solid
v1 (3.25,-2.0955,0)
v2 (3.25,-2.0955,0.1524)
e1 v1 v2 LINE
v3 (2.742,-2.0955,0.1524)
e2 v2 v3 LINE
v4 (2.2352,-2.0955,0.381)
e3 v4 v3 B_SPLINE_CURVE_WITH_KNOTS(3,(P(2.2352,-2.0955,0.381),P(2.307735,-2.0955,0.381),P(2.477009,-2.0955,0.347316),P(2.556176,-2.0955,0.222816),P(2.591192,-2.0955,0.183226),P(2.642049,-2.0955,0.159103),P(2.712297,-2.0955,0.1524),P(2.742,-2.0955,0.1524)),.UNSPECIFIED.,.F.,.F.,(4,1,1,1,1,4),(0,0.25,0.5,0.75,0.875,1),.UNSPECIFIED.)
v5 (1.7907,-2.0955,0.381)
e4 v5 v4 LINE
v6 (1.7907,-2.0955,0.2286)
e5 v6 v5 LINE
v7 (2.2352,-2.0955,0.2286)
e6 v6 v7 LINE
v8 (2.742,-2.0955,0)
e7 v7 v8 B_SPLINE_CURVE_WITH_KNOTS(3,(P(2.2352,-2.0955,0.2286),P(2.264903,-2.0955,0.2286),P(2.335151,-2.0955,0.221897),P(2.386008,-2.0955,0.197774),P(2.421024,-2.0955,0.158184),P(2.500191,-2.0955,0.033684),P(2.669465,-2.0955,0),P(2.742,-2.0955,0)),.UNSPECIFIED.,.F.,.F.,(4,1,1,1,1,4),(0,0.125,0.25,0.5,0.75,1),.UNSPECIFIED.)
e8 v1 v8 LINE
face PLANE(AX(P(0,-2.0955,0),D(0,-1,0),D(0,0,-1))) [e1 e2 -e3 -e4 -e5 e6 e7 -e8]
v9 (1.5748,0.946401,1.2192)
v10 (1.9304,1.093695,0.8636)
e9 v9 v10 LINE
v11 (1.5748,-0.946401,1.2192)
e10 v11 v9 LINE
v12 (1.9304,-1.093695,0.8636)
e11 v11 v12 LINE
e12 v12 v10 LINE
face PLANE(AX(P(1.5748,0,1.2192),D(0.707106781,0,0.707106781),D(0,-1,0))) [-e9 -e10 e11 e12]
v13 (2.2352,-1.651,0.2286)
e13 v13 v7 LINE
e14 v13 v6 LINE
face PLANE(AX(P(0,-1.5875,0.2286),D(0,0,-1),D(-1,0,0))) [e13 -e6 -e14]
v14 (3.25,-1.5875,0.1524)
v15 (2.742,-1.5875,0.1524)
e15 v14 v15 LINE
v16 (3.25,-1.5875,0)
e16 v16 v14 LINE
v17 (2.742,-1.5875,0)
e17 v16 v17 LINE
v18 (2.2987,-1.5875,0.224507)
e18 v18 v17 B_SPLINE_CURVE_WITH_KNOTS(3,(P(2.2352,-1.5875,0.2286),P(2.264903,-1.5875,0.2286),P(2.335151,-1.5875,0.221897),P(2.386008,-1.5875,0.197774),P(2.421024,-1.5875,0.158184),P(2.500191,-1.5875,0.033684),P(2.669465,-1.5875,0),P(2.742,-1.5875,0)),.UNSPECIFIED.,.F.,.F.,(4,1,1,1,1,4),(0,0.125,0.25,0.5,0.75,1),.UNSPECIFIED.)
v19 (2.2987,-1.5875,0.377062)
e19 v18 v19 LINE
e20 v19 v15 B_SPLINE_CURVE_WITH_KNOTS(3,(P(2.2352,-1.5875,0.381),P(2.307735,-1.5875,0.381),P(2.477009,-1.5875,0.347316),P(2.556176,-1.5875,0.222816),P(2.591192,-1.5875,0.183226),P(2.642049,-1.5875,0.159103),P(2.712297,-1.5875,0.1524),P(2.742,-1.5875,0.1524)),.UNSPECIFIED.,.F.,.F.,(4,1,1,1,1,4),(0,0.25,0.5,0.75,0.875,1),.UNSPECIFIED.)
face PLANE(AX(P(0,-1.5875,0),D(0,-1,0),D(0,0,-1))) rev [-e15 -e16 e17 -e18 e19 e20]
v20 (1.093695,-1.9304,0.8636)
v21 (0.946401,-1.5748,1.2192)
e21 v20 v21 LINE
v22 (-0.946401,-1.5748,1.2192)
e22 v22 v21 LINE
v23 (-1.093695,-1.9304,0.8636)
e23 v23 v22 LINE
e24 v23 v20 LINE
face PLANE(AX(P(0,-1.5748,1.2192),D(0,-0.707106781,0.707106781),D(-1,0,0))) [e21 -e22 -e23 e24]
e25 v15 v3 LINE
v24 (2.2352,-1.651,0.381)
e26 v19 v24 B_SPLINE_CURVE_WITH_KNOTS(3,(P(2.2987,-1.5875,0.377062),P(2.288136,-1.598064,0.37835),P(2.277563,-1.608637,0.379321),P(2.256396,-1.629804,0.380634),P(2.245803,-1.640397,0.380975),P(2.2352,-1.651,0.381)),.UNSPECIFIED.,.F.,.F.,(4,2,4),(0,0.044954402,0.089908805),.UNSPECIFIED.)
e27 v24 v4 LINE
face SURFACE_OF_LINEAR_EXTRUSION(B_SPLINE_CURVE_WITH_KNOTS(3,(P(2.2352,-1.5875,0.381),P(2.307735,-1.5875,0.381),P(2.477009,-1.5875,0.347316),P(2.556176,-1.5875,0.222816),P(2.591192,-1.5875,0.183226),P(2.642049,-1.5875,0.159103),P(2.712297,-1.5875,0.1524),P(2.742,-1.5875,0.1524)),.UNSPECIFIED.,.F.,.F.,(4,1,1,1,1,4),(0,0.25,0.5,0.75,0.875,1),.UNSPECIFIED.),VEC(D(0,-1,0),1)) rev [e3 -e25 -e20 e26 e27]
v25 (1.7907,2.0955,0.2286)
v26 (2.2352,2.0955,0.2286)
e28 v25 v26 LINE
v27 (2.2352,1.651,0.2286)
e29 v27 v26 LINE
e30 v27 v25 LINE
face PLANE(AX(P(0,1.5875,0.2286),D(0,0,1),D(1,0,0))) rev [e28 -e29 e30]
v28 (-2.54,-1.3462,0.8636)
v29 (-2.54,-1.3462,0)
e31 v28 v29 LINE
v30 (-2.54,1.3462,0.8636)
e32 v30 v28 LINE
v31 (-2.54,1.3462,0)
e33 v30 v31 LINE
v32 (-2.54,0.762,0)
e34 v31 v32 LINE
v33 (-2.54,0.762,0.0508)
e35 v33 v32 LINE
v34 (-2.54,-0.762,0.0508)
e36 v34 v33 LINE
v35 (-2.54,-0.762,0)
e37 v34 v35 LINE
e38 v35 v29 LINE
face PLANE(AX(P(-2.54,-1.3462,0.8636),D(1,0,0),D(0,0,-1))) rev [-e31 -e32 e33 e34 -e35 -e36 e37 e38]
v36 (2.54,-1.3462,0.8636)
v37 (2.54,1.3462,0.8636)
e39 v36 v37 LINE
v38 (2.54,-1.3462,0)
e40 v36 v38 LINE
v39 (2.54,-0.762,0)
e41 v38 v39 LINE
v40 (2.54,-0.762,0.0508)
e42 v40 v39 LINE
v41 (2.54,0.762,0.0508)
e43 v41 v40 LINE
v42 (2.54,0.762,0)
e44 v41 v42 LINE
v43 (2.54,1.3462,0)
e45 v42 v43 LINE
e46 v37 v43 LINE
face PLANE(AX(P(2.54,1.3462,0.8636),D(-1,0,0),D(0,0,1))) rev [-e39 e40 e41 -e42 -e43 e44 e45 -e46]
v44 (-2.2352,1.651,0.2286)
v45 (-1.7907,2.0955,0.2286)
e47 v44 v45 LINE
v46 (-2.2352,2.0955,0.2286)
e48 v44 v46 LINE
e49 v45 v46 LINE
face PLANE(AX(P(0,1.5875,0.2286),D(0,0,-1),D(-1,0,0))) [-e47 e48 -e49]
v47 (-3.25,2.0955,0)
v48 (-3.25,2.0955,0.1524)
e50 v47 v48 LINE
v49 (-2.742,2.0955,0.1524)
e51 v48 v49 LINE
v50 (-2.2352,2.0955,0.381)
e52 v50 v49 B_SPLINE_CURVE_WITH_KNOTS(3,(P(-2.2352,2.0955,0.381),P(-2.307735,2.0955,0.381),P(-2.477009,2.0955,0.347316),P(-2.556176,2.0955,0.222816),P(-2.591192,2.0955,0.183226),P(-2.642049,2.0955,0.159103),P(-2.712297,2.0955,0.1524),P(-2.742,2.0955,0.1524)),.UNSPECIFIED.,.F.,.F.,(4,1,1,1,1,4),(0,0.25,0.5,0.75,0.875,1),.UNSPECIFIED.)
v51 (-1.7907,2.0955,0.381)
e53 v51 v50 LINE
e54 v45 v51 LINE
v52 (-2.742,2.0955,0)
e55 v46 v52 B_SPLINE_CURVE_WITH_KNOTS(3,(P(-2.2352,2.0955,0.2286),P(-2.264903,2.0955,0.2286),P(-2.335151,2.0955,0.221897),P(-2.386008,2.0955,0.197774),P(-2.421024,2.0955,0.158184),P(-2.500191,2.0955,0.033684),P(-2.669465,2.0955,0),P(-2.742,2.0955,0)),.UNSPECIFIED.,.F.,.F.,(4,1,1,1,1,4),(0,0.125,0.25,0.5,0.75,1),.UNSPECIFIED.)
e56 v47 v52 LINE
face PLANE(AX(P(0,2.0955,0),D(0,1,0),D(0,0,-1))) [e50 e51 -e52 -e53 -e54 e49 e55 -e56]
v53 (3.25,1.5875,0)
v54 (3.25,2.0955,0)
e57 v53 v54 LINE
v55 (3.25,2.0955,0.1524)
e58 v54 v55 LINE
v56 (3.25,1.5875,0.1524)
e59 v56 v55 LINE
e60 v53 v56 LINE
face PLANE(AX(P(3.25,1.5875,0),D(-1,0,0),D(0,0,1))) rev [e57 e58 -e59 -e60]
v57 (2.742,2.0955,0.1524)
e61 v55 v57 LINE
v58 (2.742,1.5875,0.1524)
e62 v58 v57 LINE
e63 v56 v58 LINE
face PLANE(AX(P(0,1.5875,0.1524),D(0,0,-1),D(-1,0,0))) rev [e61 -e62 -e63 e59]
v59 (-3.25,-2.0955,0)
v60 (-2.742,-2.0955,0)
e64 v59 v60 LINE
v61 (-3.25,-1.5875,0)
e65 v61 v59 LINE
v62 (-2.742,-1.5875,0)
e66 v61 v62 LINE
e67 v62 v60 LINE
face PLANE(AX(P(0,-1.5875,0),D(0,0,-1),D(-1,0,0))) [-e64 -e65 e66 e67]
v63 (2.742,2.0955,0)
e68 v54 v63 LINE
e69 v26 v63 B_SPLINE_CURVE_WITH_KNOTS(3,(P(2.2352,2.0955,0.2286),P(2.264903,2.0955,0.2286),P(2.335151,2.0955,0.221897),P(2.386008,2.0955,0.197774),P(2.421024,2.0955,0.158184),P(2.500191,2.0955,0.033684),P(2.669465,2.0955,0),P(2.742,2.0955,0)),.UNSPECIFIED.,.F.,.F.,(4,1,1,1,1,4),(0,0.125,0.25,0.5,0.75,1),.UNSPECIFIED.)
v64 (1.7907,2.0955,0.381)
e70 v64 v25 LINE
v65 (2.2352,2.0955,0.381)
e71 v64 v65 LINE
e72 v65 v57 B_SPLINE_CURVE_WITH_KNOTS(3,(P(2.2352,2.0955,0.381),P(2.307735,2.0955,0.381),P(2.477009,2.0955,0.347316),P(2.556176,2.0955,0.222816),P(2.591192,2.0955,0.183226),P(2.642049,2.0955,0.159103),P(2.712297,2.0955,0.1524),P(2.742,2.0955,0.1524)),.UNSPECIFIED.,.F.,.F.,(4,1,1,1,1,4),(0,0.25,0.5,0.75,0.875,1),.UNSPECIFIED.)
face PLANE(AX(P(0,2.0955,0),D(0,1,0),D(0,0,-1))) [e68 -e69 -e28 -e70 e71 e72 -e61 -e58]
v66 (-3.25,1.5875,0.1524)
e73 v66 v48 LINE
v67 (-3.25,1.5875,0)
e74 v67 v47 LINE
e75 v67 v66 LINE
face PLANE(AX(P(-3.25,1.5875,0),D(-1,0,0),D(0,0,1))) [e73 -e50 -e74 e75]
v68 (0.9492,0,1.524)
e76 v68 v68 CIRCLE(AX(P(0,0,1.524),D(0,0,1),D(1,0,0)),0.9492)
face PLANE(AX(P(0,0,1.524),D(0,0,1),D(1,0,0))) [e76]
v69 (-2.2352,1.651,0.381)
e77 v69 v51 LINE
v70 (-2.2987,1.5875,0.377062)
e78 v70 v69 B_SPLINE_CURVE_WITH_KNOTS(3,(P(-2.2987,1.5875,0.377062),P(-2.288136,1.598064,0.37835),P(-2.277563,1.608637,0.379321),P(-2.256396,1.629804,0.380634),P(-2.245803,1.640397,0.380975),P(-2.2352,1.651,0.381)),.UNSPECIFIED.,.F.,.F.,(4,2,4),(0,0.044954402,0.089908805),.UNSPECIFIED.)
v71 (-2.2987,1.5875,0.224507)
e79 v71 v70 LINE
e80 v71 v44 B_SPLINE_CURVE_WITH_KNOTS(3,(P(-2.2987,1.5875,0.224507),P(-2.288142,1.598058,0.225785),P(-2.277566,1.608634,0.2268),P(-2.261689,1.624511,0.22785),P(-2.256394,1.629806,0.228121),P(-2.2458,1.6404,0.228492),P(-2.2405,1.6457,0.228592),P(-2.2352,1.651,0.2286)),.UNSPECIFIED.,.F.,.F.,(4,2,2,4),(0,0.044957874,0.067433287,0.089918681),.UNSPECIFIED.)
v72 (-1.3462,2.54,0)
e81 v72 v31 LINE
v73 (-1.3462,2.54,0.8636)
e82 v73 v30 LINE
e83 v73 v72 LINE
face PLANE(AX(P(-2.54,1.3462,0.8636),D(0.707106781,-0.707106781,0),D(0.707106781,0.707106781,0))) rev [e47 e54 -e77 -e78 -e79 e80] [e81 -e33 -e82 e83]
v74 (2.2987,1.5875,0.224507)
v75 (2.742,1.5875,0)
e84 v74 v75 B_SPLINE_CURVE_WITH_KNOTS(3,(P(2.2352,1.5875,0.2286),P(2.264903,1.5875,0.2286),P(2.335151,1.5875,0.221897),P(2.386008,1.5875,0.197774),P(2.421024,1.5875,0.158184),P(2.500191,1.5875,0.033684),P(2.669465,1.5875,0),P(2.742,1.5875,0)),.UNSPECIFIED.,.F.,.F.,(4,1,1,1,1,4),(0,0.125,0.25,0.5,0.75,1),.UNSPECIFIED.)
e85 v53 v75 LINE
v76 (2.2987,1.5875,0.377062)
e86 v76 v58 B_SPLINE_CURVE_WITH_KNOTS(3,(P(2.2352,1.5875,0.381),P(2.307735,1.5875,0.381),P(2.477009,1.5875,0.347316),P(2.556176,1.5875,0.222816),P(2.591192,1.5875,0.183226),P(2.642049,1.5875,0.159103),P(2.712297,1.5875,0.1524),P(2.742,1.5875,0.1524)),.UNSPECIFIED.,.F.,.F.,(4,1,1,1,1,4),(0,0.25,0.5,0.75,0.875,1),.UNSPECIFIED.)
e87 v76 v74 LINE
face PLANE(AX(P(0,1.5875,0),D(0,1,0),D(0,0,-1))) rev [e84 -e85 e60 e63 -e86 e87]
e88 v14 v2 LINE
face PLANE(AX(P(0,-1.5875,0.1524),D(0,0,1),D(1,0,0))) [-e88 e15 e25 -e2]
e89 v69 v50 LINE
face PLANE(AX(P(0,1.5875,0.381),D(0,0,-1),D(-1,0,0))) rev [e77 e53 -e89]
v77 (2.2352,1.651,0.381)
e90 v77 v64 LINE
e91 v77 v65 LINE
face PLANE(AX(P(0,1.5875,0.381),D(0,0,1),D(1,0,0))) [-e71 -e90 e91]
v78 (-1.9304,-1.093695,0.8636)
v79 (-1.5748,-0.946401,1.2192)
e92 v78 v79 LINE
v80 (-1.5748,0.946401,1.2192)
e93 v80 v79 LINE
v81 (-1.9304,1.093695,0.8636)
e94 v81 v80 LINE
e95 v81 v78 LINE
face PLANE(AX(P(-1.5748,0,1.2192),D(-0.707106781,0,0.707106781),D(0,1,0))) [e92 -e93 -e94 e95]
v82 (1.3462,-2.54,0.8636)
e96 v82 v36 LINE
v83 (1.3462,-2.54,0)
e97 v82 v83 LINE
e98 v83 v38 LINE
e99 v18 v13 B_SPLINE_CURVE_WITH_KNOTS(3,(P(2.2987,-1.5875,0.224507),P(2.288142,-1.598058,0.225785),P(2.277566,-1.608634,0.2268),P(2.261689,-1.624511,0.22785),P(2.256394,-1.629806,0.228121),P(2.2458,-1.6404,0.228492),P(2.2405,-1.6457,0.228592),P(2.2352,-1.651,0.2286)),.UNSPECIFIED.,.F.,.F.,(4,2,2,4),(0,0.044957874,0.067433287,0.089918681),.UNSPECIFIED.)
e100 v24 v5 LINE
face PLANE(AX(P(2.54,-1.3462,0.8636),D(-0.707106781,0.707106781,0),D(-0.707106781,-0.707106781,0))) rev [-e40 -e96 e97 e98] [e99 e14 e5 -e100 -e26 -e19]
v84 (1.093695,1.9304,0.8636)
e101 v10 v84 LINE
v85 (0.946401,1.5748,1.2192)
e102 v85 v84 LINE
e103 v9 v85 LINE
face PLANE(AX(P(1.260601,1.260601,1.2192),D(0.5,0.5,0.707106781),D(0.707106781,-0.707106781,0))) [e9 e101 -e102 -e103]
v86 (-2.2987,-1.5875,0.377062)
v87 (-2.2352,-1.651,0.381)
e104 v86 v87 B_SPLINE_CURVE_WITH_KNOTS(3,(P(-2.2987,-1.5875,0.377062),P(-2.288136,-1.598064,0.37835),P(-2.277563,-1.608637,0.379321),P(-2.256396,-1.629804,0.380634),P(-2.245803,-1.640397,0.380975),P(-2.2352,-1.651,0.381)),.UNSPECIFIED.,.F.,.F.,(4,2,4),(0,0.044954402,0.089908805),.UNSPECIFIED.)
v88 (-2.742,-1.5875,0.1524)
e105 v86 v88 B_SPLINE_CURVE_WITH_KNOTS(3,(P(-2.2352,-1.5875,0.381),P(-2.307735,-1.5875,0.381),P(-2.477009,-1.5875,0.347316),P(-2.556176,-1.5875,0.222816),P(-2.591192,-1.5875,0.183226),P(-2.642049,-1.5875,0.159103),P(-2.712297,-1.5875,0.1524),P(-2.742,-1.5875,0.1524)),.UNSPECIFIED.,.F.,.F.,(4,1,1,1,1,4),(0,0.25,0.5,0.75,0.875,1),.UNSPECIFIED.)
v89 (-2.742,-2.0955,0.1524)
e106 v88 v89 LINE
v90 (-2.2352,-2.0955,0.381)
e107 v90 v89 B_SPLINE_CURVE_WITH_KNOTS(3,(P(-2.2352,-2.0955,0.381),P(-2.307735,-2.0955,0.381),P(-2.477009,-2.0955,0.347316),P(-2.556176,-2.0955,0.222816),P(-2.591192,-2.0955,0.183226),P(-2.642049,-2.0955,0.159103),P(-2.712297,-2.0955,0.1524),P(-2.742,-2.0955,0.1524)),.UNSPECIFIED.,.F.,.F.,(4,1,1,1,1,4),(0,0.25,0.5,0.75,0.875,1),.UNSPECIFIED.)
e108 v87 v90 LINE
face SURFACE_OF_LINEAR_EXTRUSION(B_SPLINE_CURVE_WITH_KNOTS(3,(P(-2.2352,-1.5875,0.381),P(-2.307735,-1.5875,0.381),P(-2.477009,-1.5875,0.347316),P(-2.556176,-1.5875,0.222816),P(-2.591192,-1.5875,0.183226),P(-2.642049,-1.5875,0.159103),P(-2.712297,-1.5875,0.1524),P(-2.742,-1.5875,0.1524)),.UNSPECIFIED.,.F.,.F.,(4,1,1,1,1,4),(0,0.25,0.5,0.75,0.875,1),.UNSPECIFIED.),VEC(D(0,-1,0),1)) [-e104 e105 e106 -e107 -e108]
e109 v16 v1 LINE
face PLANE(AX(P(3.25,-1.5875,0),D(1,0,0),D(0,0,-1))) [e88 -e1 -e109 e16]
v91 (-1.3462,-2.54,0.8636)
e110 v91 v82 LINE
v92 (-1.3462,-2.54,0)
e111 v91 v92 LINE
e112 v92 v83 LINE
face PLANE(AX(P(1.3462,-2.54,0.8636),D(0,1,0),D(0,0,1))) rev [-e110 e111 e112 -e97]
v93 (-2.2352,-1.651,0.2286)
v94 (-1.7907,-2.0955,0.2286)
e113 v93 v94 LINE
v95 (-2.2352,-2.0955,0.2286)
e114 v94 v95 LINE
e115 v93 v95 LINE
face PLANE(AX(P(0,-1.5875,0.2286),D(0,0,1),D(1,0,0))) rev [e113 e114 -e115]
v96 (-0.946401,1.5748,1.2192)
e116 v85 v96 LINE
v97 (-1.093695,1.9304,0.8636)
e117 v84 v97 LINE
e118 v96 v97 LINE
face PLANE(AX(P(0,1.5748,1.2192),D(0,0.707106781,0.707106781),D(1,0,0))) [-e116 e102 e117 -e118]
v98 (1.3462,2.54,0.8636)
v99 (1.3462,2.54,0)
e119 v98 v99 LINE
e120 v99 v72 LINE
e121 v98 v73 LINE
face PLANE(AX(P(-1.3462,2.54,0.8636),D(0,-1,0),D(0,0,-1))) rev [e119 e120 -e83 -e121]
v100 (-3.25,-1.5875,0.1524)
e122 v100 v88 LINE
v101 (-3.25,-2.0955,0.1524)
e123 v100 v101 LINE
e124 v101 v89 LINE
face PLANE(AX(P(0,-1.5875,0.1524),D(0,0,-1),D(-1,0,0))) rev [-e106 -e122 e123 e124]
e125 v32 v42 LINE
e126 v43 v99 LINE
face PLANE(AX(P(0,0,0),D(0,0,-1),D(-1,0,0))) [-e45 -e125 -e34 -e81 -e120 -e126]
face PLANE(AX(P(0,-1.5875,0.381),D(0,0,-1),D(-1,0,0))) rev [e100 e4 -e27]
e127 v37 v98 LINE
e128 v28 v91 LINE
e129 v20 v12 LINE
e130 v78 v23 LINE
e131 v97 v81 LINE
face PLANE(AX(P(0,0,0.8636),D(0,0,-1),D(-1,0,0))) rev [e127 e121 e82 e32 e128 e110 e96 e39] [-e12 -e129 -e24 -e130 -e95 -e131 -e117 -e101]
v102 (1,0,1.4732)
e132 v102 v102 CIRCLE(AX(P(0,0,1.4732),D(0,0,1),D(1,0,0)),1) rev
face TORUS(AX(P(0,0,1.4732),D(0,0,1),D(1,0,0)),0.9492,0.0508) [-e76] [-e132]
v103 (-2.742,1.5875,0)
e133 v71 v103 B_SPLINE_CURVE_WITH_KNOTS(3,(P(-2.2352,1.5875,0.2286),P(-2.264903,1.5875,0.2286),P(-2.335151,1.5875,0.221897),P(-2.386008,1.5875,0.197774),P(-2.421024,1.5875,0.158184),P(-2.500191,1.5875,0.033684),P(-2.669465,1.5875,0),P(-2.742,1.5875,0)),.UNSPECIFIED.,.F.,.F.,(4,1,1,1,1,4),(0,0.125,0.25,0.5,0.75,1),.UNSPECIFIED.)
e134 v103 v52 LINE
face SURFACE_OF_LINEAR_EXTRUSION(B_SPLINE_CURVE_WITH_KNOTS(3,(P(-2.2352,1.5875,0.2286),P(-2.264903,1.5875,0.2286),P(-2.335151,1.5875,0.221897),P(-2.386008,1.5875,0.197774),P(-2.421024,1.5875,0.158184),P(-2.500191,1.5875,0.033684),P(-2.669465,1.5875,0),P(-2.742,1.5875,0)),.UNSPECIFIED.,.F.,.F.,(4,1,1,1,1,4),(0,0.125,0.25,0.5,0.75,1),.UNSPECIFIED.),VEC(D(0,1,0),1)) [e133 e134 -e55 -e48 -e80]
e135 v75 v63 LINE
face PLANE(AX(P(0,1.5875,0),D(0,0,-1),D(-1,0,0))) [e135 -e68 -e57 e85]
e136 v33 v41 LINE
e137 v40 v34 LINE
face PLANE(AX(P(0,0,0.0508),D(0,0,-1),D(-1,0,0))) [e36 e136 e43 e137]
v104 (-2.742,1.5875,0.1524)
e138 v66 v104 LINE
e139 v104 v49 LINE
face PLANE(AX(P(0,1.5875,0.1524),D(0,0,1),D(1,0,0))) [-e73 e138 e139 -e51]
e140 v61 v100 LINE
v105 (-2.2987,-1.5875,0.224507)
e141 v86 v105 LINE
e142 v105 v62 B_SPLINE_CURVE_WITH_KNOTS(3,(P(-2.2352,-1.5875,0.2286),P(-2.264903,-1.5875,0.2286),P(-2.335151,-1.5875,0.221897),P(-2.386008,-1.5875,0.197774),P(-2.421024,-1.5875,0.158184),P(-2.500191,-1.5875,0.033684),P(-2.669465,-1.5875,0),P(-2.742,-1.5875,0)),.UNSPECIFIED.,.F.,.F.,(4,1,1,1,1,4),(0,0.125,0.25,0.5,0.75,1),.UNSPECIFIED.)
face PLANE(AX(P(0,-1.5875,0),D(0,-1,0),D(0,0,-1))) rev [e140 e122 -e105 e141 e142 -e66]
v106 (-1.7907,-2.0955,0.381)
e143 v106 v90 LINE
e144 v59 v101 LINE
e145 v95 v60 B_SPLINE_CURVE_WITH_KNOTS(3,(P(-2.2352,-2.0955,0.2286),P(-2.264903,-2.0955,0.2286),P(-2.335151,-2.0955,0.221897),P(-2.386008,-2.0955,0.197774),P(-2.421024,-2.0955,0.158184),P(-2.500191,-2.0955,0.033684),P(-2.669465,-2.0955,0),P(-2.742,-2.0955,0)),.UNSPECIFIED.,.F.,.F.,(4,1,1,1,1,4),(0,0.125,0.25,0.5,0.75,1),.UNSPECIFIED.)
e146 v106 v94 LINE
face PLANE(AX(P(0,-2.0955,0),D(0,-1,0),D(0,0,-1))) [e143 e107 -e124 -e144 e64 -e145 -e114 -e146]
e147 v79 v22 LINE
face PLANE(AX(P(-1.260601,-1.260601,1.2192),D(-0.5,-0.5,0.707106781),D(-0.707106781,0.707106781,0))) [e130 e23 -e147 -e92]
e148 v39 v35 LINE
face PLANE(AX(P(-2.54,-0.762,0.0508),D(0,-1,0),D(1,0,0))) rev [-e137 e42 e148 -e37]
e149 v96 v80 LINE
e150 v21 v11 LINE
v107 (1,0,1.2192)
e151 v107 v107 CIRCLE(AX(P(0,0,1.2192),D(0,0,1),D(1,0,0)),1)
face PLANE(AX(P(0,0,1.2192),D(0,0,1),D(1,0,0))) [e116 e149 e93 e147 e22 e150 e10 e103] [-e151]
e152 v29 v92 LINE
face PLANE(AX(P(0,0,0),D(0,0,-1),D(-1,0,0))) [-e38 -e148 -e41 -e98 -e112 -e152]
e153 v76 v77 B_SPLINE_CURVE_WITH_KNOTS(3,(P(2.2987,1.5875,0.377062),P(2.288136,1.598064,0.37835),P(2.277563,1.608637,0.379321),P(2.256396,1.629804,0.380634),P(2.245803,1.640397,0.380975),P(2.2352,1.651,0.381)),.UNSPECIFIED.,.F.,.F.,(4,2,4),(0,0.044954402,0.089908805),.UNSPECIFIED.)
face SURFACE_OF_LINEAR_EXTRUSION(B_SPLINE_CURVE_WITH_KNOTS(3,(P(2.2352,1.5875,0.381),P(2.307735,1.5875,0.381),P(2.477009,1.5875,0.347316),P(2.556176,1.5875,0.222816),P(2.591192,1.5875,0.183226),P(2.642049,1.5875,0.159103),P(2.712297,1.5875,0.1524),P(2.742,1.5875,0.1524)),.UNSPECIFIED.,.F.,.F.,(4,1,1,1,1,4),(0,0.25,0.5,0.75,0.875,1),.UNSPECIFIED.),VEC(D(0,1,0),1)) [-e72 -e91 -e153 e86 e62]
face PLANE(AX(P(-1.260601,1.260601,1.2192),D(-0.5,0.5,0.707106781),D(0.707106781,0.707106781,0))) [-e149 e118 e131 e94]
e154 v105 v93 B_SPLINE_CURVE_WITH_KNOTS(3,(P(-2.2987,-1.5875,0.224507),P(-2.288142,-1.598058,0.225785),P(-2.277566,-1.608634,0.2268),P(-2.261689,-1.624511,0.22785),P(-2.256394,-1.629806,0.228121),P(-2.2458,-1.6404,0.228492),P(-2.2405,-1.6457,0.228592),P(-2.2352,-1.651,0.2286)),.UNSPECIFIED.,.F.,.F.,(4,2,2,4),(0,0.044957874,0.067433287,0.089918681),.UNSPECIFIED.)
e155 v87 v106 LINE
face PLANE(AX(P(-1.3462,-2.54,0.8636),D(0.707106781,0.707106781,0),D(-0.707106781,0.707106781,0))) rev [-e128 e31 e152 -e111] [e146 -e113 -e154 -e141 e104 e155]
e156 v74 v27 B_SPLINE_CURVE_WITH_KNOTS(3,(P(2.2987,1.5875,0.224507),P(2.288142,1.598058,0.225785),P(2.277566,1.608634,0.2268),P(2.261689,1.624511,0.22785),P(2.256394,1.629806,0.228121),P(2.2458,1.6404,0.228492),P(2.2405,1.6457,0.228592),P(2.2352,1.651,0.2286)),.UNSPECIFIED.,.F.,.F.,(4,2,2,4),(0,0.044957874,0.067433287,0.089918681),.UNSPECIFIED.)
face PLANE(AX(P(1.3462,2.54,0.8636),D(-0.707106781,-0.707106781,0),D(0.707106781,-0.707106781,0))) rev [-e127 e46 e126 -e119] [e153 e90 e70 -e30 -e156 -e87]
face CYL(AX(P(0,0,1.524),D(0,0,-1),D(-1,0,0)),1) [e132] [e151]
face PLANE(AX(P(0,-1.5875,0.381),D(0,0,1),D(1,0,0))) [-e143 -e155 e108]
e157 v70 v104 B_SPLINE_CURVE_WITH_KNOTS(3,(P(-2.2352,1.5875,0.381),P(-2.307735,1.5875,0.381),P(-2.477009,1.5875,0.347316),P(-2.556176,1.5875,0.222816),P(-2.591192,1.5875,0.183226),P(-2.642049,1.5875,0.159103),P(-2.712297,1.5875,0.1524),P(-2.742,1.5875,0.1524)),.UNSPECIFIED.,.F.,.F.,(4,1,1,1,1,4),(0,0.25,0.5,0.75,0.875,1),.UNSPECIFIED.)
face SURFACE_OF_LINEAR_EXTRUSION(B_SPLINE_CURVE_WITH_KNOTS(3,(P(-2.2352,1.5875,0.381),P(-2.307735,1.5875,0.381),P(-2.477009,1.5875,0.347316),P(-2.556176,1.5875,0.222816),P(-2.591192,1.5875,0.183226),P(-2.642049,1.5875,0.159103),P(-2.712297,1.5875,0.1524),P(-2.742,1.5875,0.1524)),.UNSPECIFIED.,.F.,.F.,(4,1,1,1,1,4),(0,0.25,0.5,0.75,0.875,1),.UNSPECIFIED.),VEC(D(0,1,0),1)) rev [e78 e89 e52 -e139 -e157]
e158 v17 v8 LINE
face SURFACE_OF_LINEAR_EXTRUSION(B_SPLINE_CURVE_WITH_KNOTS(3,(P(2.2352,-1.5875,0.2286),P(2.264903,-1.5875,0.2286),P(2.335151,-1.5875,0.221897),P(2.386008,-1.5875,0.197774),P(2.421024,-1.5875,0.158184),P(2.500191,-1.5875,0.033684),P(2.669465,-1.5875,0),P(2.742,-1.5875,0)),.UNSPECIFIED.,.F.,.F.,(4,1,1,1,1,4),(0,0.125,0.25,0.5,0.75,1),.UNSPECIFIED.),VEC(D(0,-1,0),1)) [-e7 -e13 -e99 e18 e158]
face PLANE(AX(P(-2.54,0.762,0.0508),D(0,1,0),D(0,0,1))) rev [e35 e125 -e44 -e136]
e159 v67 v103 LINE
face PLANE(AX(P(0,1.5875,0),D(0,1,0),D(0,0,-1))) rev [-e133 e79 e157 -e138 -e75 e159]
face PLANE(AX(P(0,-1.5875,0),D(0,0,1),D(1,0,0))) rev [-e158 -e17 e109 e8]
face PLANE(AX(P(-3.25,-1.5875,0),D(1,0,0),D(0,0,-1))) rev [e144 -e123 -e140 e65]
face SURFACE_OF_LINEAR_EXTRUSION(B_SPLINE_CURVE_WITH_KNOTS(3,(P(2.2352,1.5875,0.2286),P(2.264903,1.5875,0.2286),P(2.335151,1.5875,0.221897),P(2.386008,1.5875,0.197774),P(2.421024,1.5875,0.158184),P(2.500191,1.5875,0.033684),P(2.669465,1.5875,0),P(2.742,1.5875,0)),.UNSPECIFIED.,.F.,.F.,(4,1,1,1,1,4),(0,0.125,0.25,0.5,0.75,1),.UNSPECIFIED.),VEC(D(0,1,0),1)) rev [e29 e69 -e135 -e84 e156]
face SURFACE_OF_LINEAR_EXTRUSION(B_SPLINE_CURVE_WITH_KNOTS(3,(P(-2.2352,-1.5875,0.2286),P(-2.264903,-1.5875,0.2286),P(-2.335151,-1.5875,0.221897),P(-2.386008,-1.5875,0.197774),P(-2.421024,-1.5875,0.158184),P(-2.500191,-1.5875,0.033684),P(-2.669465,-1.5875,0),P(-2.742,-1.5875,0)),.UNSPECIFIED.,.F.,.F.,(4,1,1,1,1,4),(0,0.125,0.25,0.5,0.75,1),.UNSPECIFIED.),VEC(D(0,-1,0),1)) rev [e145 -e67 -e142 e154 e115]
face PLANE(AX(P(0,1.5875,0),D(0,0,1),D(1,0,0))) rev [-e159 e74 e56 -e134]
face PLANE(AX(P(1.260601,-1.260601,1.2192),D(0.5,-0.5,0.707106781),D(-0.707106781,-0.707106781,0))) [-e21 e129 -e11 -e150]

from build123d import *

# Parameters (mm, degrees)
BASE_DEPTH              = 0.8636
TIER1_DEPTH             = 0.3556
CHAMFER1_SIZE           = 0.3556
SKETCH3_R               = 1
BUTTON_DEPTH            = 0.3048
BUTTONC_R               = 0.0508
SKETCH4_W               = 5.08
SKETCH4_H               = 1.524
BOTTOM_CUT_DEPTH        = 0.0508
PINS_START              = -0.4445
SKETCH6_W               = 0.508
SKETCH6_H               = 0.1524
PINS_DEPTH              = 0.508
MIRROR2_START           = -0.4445
MIRROR2_COPY_1_SKETCH_W = 0.508
MIRROR2_COPY_1_SKETCH_H = 0.1524
MIRROR2_COPY_1_DEPTH    = 0.508


with BuildPart() as part:
    # Sketch1 → Base (new body)
    with BuildSketch(Plane.XY):
        Polygon((-1.3462, 2.54), (1.3462, 2.54), (2.54, 1.3462), (2.54, -1.3462), (1.3462, -2.54), (-1.3462, -2.54), (-2.54, -1.3462), (-2.54, 1.3462), align=None)
    extrude(amount=BASE_DEPTH)

    # Sketch2 → Tier1 (add)
    with BuildSketch(Plane.XY.offset(0.8636)):
        Polygon((-1.093695412, 1.9304), (-1.9304, 1.093695412), (-1.9304, -1.093695412), (-1.093695412, -1.9304), (1.093695412, -1.9304), (1.9304, -1.093695412), (1.9304, 1.093695412), (1.093695412, 1.9304), align=None)
    extrude(amount=TIER1_DEPTH)

    # Chamfer1
    chamfer1_edges = [part.edges().sort_by_distance(p)[0] for p in [
        (-1.512047706, 1.512047706, 1.2192),
        (0, 1.9304, 1.2192),
        (1.512047706, 1.512047706, 1.2192),
        (1.9304, 0, 1.2192),
        (1.512047706, -1.512047706, 1.2192),
        (0, -1.9304, 1.2192),
        (-1.512047706, -1.512047706, 1.2192),
        (-1.9304, 0, 1.2192),
    ]]
    chamfer(chamfer1_edges, length=CHAMFER1_SIZE - 0.0001)  # a hair under: the kernel refuses the full size

    # Sketch3 → Button (add)
    with BuildSketch(Plane.XY.offset(1.2192)):
        Circle(SKETCH3_R)
    extrude(amount=BUTTON_DEPTH)

    # ButtonC
    buttonc_edges = [part.edges().sort_by_distance(p)[0] for p in [
        (-1, 0, 1.524),
    ]]
    fillet(buttonc_edges, radius=BUTTONC_R)

    # Sketch4 → Bottom cut (cut)
    with BuildSketch(Plane(origin=(0, 0, 0), x_dir=(-1, 0, 0), z_dir=(0, 0, -1))):
        Rectangle(SKETCH4_W, SKETCH4_H)
    extrude(amount=-BOTTOM_CUT_DEPTH, mode=Mode.SUBTRACT)

    # Sketch6 → pins (add)
    with BuildSketch(Plane.XZ.offset(2.54).offset(PINS_START)):
        with Locations((-1.0922, 0.3048)):
            Rectangle(SKETCH6_W, SKETCH6_H)
        Polygon((-1.3462, 0.2286), (-1.3462, 0.381), (-2.2352, 0.381), (-2.2352, 0.3048), (-2.2352, 0.2286), align=None)
        with BuildLine():
            Line((-2.2352, 0.3048), (-2.2352, 0.381))
            add(Edge.make_bspline(
                [(-2.2352, 0.381), (-2.307735088, 0.381), (-2.477008689, 0.347316172), (-2.556176281, 0.222815828), (-2.591192004, 0.183226461), (-2.642048799, 0.15910292), (-2.712296659, 0.1524), (-2.742, 0.1524)],
                knots=[0, 0, 0, 0, 0.25, 0.5, 0.75, 0.875, 1, 1, 1, 1], degree=3))
            Line((-2.742, 0.1524), (-2.742, 0.0762))
            add(Edge.make_bspline(
                [(-2.2352, 0.3048), (-2.573866667, 0.3048), (-2.403333333, 0.0762), (-2.742, 0.0762)],
                knots=[0, 0, 0, 0, 1, 1, 1, 1], degree=3))
        make_face()
        with BuildLine():
            Line((-2.2352, 0.2286), (-2.2352, 0.3048))
            add(Edge.make_bspline(
                [(-2.2352, 0.3048), (-2.573866667, 0.3048), (-2.403333333, 0.0762), (-2.742, 0.0762)],
                knots=[0, 0, 0, 0, 1, 1, 1, 1], degree=3))
            Line((-2.742, 0.0762), (-2.742, 0))
            add(Edge.make_bspline(
                [(-2.2352, 0.2286), (-2.264903341, 0.2286), (-2.335151201, 0.22189708), (-2.386007996, 0.197773539), (-2.421023719, 0.158184172), (-2.500191311, 0.033683828), (-2.669464912, 0), (-2.742, 0)],
                knots=[0, 0, 0, 0, 0.125, 0.25, 0.5, 0.75, 1, 1, 1, 1], degree=3))
        make_face()
        with Locations((-2.996, 0.0762)):
            Rectangle(SKETCH6_W, SKETCH6_H)
    pins = extrude(amount=-PINS_DEPTH)

    # pins2: pins across plane
    add(pins.mirror(Plane.ZX))

    # Mirror2: pins across plane
    add(pins.mirror(Plane(origin=(0, 0, 0), x_dir=(0, 0, 1), z_dir=(1, 0, 0))))

    # Mirror2 copy 1 sketch → Mirror2 copy 1 (add)
    with BuildSketch(Plane(origin=(0, 2.54, 0), x_dir=(-1, 0, 0), z_dir=(0, 1, 0)).offset(MIRROR2_START)):
        with Locations((-1.0922, 0.3048)):
            Rectangle(MIRROR2_COPY_1_SKETCH_W, MIRROR2_COPY_1_SKETCH_H)
        Polygon((-1.3462, 0.2286), (-1.3462, 0.381), (-2.2352, 0.381), (-2.2352, 0.3048), (-2.2352, 0.2286), align=None)
        with BuildLine():
            Line((-2.2352, 0.3048), (-2.2352, 0.381))
            add(Edge.make_bspline(
                [(-2.2352, 0.381), (-2.307735088, 0.381), (-2.477008689, 0.347316172), (-2.556176281, 0.222815828), (-2.591192004, 0.183226461), (-2.642048799, 0.15910292), (-2.712296659, 0.1524), (-2.742, 0.1524)],
                knots=[0, 0, 0, 0, 0.25, 0.5, 0.75, 0.875, 1, 1, 1, 1], degree=3))
            Line((-2.742, 0.1524), (-2.742, 0.0762))
            add(Edge.make_bspline(
                [(-2.2352, 0.3048), (-2.573866667, 0.3048), (-2.403333333, 0.0762), (-2.742, 0.0762)],
                knots=[0, 0, 0, 0, 1, 1, 1, 1], degree=3))
        make_face()
        with BuildLine():
            Line((-2.2352, 0.2286), (-2.2352, 0.3048))
            add(Edge.make_bspline(
                [(-2.2352, 0.3048), (-2.573866667, 0.3048), (-2.403333333, 0.0762), (-2.742, 0.0762)],
                knots=[0, 0, 0, 0, 1, 1, 1, 1], degree=3))
            Line((-2.742, 0.0762), (-2.742, 0))
            add(Edge.make_bspline(
                [(-2.2352, 0.2286), (-2.264903341, 0.2286), (-2.335151201, 0.22189708), (-2.386007996, 0.197773539), (-2.421023719, 0.158184172), (-2.500191311, 0.033683828), (-2.669464912, 0), (-2.742, 0)],
                knots=[0, 0, 0, 0, 0.125, 0.25, 0.5, 0.75, 1, 1, 1, 1], degree=3))
        make_face()
        with Locations((-2.996, 0.0762)):
            Rectangle(MIRROR2_COPY_1_SKETCH_W, MIRROR2_COPY_1_SKETCH_H)
    extrude(amount=-MIRROR2_COPY_1_DEPTH)


solid = part.part
